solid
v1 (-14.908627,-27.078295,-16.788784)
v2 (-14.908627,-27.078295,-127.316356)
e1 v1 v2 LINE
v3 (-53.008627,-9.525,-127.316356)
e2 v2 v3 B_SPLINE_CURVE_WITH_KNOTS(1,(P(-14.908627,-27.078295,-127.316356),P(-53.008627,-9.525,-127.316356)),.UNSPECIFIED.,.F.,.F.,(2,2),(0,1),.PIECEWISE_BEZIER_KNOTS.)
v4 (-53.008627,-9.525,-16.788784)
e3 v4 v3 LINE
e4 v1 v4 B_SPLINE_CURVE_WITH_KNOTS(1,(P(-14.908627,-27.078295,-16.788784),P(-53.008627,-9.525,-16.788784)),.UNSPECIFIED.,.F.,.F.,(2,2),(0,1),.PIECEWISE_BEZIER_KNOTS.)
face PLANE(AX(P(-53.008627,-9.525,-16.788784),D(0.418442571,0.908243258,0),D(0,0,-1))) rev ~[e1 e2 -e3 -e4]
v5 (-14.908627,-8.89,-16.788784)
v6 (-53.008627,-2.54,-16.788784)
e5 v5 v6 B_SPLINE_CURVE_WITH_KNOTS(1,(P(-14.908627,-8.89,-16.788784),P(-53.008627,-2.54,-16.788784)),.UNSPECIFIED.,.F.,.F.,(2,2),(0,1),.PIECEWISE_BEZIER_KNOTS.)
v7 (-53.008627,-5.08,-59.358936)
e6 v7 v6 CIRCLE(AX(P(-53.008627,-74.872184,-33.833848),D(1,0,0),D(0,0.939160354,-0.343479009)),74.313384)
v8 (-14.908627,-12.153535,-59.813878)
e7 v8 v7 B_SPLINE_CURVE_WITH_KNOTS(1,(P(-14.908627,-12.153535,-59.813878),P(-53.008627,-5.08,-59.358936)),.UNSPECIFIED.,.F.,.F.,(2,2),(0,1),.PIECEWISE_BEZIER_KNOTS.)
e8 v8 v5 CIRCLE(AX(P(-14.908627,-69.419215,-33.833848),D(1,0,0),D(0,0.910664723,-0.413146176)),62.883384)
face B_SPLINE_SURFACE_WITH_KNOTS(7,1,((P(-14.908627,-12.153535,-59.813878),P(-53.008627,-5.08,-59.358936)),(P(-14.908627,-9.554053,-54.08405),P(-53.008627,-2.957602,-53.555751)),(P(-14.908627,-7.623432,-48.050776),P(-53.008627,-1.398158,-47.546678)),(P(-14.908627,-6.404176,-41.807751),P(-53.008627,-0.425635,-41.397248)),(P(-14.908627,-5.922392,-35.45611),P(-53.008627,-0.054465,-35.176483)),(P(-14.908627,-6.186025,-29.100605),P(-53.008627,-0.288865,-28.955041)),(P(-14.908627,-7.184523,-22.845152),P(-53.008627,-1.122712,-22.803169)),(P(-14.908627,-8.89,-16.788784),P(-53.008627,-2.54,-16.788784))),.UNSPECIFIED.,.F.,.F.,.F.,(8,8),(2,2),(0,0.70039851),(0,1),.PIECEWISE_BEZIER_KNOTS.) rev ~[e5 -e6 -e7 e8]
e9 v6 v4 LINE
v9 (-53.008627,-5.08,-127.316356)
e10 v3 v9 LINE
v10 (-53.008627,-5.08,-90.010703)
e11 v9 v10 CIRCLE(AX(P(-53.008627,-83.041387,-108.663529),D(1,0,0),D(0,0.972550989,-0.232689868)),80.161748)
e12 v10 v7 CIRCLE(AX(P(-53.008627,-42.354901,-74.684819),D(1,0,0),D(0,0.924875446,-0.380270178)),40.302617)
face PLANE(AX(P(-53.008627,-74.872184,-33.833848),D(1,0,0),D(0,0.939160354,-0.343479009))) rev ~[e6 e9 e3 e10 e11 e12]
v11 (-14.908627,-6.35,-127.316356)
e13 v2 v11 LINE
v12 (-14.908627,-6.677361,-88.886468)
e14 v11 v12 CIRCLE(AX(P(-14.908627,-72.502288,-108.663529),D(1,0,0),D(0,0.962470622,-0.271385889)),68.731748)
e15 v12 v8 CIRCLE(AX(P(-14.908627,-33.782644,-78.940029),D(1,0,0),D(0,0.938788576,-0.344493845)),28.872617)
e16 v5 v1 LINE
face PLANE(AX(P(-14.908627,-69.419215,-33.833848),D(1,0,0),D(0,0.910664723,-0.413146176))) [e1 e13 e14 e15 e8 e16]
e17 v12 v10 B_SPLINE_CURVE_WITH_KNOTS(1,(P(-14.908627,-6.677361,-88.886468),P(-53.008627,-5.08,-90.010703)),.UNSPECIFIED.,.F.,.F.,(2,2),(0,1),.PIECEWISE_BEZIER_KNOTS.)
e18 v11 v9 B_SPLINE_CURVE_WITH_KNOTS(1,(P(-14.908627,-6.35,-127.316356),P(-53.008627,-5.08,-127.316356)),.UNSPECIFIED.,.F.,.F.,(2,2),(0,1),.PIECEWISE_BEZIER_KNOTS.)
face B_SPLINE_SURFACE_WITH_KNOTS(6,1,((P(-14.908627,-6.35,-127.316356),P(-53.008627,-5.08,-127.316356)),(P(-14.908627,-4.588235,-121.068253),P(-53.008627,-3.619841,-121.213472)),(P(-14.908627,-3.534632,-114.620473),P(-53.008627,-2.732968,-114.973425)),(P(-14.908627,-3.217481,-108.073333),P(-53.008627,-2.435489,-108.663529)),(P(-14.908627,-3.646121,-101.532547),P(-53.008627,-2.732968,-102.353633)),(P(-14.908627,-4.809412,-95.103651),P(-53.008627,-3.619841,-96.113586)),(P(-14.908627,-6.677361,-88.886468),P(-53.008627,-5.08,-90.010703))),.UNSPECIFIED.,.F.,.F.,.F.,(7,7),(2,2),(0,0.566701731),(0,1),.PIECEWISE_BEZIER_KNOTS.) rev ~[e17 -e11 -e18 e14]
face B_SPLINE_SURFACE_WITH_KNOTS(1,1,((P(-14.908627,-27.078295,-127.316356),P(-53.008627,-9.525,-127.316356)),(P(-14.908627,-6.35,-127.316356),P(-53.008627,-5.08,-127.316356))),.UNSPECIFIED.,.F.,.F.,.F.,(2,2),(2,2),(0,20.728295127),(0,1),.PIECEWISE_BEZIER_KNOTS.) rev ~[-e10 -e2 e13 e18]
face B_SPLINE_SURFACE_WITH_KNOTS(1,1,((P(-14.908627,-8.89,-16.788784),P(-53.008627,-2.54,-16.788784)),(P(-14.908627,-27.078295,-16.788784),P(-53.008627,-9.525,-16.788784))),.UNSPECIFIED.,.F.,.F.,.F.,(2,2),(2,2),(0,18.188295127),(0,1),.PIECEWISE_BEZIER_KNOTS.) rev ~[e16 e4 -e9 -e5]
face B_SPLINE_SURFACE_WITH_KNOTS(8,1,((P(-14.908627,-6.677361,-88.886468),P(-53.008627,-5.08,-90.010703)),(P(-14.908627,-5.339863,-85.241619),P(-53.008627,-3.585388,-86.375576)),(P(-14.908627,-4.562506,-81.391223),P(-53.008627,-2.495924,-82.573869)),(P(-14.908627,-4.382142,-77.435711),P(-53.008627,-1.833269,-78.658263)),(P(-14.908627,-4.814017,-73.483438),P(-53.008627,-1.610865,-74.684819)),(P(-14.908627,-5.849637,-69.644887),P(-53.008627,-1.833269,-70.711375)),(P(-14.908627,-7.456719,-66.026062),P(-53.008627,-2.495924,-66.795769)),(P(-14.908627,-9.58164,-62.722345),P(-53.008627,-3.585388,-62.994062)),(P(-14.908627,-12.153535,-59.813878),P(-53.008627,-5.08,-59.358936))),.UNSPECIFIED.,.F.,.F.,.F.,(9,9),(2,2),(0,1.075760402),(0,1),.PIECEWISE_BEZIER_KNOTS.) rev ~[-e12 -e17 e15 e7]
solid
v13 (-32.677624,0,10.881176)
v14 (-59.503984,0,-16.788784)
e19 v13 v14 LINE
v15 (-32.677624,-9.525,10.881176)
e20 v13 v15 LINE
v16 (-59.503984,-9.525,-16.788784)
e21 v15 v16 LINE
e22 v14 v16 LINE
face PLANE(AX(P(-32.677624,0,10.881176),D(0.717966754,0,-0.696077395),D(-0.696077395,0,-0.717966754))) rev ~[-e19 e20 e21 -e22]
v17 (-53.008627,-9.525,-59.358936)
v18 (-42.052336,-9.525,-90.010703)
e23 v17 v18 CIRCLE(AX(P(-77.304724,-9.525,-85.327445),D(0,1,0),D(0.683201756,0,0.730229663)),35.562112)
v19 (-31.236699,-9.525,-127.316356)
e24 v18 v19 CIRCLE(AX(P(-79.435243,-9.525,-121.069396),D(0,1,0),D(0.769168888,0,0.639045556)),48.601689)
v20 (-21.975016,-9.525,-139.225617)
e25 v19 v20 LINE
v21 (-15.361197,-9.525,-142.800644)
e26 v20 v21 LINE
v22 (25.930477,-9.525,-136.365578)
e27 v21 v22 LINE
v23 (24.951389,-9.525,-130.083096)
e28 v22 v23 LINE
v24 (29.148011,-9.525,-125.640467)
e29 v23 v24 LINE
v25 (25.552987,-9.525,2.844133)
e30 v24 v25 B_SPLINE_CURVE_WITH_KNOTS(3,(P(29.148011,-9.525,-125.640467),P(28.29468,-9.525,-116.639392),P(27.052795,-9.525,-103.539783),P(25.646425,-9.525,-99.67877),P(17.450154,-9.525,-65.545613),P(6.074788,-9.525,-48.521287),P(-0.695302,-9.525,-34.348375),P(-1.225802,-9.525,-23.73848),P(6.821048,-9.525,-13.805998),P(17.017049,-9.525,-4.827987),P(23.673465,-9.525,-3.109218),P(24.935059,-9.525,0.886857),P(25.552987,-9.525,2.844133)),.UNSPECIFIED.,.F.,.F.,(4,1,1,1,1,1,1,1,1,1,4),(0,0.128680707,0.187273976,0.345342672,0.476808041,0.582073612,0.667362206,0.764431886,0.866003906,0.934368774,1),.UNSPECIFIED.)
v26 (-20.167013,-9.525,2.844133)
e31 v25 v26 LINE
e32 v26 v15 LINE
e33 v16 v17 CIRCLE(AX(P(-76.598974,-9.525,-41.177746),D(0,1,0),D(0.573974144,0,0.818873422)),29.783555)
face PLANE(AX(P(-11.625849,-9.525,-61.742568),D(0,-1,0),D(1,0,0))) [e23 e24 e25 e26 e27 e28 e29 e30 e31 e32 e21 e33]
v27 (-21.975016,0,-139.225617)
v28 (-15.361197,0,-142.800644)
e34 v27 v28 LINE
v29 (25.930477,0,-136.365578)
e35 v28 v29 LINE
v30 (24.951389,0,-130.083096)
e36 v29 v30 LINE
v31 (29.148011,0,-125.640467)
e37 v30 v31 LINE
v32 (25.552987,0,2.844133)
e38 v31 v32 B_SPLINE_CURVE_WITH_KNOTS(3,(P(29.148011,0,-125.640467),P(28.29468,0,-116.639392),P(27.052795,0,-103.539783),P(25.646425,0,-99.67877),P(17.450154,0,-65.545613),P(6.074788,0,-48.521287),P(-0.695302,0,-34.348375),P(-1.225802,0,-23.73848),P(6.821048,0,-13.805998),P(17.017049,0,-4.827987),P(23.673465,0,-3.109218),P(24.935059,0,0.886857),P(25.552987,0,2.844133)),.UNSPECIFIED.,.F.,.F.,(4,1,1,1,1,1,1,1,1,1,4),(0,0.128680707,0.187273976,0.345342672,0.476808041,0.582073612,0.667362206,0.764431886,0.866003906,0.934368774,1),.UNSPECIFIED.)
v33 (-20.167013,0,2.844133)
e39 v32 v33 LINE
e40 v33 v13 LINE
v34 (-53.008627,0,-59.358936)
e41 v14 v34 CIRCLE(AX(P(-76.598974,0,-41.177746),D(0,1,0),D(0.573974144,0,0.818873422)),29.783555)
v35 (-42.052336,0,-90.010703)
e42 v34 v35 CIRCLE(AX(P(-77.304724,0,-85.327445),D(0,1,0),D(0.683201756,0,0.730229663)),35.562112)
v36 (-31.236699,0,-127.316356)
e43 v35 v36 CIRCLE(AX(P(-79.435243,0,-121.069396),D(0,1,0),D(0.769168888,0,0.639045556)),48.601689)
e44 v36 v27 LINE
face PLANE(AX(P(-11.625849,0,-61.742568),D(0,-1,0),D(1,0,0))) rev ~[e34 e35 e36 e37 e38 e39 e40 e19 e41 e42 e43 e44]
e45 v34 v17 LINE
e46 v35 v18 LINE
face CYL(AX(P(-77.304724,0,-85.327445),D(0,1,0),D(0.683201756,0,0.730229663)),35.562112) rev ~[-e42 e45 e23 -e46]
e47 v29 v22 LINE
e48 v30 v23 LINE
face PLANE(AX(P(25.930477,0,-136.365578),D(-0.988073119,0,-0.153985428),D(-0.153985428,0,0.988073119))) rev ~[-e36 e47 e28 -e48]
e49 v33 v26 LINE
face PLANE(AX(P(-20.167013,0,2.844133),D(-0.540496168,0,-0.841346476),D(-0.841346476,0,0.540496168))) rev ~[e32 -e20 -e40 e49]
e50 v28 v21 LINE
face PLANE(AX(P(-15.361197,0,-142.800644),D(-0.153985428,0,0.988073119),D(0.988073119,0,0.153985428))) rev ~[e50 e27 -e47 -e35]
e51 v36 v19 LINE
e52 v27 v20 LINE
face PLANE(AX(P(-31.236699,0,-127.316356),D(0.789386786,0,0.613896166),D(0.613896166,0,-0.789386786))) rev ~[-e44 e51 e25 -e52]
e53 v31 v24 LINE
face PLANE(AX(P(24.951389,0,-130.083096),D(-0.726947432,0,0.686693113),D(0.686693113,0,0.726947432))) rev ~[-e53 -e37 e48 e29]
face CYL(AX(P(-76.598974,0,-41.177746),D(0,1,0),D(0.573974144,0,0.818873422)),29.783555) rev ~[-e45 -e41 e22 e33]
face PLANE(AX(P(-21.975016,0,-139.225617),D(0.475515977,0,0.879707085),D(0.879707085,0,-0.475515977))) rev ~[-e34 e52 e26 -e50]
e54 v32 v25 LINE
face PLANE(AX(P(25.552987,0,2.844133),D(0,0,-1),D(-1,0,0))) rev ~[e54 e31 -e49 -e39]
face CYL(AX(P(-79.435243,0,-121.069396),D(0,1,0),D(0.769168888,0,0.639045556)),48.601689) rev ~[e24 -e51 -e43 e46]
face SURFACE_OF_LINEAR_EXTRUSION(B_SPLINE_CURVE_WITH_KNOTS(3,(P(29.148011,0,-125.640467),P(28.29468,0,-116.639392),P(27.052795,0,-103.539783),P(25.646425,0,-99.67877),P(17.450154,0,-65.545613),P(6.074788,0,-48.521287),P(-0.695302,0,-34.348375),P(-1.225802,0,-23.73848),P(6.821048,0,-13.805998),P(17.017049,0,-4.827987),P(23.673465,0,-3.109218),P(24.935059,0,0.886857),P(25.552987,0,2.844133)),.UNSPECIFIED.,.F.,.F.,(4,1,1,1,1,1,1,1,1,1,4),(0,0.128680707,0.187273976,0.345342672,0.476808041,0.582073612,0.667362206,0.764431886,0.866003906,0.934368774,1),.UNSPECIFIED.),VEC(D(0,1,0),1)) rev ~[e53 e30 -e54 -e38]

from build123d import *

# Parameters (mm, degrees)
F1_DEPTH = 9.525


with BuildPart() as f1:
    # F0 (on Front) → F1 (new body)
    with BuildSketch(Plane.XZ):
        with BuildLine():
            Line((25.5529873787, 2.8441333306), (-20.1670126213, 2.8441333306))
            Line((-20.1670126213, 2.8441333306), (-32.6776243746, 10.8811762184))
            Line((-32.6776243746, 10.8811762184), (-59.5039837062, -16.7887844145))
            ThreePointArc((-59.5039837062, -16.7887844145), (-47.1561716454, -36.685361085), (-53.0086271465, -59.3589358032))
            ThreePointArc((-53.0086271465, -59.3589358032), (-43.8175889792, -73.3576679015), (-42.0523360372, -90.01070261))
            ThreePointArc((-42.0523360372, -90.01070261), (-32.7557600238, -107.5361024576), (-31.236698851, -127.3163557053))
            Line((-31.236698851, -127.3163557053), (-21.9750162214, -139.2256170511))
            Line((-21.9750162214, -139.2256170511), (-15.3611972928, -142.8006440401))
            Line((-15.3611972928, -142.8006440401), (25.9304773062, -136.3655775785))
            Line((25.9304773062, -136.3655775785), (24.9513892664, -130.0830962729))
            Line((24.9513892664, -130.0830962729), (29.148010537, -125.6404668093))
            add(Edge.make_bspline(
                [(29.148010537, -125.6404668093), (28.2946798198, -116.6393923055), (27.0527948496, -103.5397828384), (25.6464249734, -99.678769998), (17.4501539035, -65.5456126073), (6.0747879382, -48.5212865138), (-0.6953024195, -34.3483750512), (-1.2258021041, -23.7384798264), (6.8210480205, -13.805998052), (17.0170487732, -4.8279874656), (23.6734646695, -3.1092179724), (24.9350590303, 0.8868574115), (25.5529873787, 2.8441333306)],
                knots=[0, 0, 0, 0, 0.1286807075, 0.1872739764, 0.3453426722, 0.476808041, 0.5820736122, 0.6673622055, 0.7644318863, 0.8660039058, 0.9343687735, 1, 1, 1, 1], degree=3))
        make_face()
    extrude(amount=F1_DEPTH)


with BuildPart() as f6:
    # F5 (on face) → F6 section 0
    with BuildSketch(Plane.YZ.offset(-14.9086271465)):
        with BuildLine():
            ThreePointArc((-12.1535348742, -59.8138779625), (-6.7159535078, -38.5900093867), (-8.89, -16.7887844145))
            Line((-8.89, -16.7887844145), (-27.0782951266, -16.7887844145))
            Line((-27.0782951266, -16.7887844145), (-27.0782951266, -127.3163557053))
            Line((-27.0782951266, -127.3163557053), (-6.35, -127.3163557053))
            ThreePointArc((-6.35, -127.3163557053), (-3.7730338417, -108.0780656946), (-6.6773612612, -88.8864675498))
            ThreePointArc((-6.6773612612, -88.8864675498), (-5.4089924739, -73.595508424), (-12.1535348742, -59.8138779625))
        make_face()
    # F3 (on face) → F6 section 1
    with BuildSketch(Plane.YZ.offset(-53.0086271465)):
        with BuildLine():
            Line((-2.54, -16.7887844145), (-9.525, -16.7887844145))
            Line((-9.525, -16.7887844145), (-9.525, -127.3163557053))
            Line((-9.525, -127.3163557053), (-5.08, -127.3163557053))
            ThreePointArc((-5.08, -127.3163557053), (-2.8796392632, -108.6635291576), (-5.08, -90.01070261))
            ThreePointArc((-5.08, -90.01070261), (-2.0522838803, -74.6848192066), (-5.08, -59.3589358032))
            ThreePointArc((-5.08, -59.3589358032), (-0.6907278213, -38.2599752876), (-2.54, -16.7887844145))
        make_face()
    loft()


solid = Compound([f1.part, f6.part])
